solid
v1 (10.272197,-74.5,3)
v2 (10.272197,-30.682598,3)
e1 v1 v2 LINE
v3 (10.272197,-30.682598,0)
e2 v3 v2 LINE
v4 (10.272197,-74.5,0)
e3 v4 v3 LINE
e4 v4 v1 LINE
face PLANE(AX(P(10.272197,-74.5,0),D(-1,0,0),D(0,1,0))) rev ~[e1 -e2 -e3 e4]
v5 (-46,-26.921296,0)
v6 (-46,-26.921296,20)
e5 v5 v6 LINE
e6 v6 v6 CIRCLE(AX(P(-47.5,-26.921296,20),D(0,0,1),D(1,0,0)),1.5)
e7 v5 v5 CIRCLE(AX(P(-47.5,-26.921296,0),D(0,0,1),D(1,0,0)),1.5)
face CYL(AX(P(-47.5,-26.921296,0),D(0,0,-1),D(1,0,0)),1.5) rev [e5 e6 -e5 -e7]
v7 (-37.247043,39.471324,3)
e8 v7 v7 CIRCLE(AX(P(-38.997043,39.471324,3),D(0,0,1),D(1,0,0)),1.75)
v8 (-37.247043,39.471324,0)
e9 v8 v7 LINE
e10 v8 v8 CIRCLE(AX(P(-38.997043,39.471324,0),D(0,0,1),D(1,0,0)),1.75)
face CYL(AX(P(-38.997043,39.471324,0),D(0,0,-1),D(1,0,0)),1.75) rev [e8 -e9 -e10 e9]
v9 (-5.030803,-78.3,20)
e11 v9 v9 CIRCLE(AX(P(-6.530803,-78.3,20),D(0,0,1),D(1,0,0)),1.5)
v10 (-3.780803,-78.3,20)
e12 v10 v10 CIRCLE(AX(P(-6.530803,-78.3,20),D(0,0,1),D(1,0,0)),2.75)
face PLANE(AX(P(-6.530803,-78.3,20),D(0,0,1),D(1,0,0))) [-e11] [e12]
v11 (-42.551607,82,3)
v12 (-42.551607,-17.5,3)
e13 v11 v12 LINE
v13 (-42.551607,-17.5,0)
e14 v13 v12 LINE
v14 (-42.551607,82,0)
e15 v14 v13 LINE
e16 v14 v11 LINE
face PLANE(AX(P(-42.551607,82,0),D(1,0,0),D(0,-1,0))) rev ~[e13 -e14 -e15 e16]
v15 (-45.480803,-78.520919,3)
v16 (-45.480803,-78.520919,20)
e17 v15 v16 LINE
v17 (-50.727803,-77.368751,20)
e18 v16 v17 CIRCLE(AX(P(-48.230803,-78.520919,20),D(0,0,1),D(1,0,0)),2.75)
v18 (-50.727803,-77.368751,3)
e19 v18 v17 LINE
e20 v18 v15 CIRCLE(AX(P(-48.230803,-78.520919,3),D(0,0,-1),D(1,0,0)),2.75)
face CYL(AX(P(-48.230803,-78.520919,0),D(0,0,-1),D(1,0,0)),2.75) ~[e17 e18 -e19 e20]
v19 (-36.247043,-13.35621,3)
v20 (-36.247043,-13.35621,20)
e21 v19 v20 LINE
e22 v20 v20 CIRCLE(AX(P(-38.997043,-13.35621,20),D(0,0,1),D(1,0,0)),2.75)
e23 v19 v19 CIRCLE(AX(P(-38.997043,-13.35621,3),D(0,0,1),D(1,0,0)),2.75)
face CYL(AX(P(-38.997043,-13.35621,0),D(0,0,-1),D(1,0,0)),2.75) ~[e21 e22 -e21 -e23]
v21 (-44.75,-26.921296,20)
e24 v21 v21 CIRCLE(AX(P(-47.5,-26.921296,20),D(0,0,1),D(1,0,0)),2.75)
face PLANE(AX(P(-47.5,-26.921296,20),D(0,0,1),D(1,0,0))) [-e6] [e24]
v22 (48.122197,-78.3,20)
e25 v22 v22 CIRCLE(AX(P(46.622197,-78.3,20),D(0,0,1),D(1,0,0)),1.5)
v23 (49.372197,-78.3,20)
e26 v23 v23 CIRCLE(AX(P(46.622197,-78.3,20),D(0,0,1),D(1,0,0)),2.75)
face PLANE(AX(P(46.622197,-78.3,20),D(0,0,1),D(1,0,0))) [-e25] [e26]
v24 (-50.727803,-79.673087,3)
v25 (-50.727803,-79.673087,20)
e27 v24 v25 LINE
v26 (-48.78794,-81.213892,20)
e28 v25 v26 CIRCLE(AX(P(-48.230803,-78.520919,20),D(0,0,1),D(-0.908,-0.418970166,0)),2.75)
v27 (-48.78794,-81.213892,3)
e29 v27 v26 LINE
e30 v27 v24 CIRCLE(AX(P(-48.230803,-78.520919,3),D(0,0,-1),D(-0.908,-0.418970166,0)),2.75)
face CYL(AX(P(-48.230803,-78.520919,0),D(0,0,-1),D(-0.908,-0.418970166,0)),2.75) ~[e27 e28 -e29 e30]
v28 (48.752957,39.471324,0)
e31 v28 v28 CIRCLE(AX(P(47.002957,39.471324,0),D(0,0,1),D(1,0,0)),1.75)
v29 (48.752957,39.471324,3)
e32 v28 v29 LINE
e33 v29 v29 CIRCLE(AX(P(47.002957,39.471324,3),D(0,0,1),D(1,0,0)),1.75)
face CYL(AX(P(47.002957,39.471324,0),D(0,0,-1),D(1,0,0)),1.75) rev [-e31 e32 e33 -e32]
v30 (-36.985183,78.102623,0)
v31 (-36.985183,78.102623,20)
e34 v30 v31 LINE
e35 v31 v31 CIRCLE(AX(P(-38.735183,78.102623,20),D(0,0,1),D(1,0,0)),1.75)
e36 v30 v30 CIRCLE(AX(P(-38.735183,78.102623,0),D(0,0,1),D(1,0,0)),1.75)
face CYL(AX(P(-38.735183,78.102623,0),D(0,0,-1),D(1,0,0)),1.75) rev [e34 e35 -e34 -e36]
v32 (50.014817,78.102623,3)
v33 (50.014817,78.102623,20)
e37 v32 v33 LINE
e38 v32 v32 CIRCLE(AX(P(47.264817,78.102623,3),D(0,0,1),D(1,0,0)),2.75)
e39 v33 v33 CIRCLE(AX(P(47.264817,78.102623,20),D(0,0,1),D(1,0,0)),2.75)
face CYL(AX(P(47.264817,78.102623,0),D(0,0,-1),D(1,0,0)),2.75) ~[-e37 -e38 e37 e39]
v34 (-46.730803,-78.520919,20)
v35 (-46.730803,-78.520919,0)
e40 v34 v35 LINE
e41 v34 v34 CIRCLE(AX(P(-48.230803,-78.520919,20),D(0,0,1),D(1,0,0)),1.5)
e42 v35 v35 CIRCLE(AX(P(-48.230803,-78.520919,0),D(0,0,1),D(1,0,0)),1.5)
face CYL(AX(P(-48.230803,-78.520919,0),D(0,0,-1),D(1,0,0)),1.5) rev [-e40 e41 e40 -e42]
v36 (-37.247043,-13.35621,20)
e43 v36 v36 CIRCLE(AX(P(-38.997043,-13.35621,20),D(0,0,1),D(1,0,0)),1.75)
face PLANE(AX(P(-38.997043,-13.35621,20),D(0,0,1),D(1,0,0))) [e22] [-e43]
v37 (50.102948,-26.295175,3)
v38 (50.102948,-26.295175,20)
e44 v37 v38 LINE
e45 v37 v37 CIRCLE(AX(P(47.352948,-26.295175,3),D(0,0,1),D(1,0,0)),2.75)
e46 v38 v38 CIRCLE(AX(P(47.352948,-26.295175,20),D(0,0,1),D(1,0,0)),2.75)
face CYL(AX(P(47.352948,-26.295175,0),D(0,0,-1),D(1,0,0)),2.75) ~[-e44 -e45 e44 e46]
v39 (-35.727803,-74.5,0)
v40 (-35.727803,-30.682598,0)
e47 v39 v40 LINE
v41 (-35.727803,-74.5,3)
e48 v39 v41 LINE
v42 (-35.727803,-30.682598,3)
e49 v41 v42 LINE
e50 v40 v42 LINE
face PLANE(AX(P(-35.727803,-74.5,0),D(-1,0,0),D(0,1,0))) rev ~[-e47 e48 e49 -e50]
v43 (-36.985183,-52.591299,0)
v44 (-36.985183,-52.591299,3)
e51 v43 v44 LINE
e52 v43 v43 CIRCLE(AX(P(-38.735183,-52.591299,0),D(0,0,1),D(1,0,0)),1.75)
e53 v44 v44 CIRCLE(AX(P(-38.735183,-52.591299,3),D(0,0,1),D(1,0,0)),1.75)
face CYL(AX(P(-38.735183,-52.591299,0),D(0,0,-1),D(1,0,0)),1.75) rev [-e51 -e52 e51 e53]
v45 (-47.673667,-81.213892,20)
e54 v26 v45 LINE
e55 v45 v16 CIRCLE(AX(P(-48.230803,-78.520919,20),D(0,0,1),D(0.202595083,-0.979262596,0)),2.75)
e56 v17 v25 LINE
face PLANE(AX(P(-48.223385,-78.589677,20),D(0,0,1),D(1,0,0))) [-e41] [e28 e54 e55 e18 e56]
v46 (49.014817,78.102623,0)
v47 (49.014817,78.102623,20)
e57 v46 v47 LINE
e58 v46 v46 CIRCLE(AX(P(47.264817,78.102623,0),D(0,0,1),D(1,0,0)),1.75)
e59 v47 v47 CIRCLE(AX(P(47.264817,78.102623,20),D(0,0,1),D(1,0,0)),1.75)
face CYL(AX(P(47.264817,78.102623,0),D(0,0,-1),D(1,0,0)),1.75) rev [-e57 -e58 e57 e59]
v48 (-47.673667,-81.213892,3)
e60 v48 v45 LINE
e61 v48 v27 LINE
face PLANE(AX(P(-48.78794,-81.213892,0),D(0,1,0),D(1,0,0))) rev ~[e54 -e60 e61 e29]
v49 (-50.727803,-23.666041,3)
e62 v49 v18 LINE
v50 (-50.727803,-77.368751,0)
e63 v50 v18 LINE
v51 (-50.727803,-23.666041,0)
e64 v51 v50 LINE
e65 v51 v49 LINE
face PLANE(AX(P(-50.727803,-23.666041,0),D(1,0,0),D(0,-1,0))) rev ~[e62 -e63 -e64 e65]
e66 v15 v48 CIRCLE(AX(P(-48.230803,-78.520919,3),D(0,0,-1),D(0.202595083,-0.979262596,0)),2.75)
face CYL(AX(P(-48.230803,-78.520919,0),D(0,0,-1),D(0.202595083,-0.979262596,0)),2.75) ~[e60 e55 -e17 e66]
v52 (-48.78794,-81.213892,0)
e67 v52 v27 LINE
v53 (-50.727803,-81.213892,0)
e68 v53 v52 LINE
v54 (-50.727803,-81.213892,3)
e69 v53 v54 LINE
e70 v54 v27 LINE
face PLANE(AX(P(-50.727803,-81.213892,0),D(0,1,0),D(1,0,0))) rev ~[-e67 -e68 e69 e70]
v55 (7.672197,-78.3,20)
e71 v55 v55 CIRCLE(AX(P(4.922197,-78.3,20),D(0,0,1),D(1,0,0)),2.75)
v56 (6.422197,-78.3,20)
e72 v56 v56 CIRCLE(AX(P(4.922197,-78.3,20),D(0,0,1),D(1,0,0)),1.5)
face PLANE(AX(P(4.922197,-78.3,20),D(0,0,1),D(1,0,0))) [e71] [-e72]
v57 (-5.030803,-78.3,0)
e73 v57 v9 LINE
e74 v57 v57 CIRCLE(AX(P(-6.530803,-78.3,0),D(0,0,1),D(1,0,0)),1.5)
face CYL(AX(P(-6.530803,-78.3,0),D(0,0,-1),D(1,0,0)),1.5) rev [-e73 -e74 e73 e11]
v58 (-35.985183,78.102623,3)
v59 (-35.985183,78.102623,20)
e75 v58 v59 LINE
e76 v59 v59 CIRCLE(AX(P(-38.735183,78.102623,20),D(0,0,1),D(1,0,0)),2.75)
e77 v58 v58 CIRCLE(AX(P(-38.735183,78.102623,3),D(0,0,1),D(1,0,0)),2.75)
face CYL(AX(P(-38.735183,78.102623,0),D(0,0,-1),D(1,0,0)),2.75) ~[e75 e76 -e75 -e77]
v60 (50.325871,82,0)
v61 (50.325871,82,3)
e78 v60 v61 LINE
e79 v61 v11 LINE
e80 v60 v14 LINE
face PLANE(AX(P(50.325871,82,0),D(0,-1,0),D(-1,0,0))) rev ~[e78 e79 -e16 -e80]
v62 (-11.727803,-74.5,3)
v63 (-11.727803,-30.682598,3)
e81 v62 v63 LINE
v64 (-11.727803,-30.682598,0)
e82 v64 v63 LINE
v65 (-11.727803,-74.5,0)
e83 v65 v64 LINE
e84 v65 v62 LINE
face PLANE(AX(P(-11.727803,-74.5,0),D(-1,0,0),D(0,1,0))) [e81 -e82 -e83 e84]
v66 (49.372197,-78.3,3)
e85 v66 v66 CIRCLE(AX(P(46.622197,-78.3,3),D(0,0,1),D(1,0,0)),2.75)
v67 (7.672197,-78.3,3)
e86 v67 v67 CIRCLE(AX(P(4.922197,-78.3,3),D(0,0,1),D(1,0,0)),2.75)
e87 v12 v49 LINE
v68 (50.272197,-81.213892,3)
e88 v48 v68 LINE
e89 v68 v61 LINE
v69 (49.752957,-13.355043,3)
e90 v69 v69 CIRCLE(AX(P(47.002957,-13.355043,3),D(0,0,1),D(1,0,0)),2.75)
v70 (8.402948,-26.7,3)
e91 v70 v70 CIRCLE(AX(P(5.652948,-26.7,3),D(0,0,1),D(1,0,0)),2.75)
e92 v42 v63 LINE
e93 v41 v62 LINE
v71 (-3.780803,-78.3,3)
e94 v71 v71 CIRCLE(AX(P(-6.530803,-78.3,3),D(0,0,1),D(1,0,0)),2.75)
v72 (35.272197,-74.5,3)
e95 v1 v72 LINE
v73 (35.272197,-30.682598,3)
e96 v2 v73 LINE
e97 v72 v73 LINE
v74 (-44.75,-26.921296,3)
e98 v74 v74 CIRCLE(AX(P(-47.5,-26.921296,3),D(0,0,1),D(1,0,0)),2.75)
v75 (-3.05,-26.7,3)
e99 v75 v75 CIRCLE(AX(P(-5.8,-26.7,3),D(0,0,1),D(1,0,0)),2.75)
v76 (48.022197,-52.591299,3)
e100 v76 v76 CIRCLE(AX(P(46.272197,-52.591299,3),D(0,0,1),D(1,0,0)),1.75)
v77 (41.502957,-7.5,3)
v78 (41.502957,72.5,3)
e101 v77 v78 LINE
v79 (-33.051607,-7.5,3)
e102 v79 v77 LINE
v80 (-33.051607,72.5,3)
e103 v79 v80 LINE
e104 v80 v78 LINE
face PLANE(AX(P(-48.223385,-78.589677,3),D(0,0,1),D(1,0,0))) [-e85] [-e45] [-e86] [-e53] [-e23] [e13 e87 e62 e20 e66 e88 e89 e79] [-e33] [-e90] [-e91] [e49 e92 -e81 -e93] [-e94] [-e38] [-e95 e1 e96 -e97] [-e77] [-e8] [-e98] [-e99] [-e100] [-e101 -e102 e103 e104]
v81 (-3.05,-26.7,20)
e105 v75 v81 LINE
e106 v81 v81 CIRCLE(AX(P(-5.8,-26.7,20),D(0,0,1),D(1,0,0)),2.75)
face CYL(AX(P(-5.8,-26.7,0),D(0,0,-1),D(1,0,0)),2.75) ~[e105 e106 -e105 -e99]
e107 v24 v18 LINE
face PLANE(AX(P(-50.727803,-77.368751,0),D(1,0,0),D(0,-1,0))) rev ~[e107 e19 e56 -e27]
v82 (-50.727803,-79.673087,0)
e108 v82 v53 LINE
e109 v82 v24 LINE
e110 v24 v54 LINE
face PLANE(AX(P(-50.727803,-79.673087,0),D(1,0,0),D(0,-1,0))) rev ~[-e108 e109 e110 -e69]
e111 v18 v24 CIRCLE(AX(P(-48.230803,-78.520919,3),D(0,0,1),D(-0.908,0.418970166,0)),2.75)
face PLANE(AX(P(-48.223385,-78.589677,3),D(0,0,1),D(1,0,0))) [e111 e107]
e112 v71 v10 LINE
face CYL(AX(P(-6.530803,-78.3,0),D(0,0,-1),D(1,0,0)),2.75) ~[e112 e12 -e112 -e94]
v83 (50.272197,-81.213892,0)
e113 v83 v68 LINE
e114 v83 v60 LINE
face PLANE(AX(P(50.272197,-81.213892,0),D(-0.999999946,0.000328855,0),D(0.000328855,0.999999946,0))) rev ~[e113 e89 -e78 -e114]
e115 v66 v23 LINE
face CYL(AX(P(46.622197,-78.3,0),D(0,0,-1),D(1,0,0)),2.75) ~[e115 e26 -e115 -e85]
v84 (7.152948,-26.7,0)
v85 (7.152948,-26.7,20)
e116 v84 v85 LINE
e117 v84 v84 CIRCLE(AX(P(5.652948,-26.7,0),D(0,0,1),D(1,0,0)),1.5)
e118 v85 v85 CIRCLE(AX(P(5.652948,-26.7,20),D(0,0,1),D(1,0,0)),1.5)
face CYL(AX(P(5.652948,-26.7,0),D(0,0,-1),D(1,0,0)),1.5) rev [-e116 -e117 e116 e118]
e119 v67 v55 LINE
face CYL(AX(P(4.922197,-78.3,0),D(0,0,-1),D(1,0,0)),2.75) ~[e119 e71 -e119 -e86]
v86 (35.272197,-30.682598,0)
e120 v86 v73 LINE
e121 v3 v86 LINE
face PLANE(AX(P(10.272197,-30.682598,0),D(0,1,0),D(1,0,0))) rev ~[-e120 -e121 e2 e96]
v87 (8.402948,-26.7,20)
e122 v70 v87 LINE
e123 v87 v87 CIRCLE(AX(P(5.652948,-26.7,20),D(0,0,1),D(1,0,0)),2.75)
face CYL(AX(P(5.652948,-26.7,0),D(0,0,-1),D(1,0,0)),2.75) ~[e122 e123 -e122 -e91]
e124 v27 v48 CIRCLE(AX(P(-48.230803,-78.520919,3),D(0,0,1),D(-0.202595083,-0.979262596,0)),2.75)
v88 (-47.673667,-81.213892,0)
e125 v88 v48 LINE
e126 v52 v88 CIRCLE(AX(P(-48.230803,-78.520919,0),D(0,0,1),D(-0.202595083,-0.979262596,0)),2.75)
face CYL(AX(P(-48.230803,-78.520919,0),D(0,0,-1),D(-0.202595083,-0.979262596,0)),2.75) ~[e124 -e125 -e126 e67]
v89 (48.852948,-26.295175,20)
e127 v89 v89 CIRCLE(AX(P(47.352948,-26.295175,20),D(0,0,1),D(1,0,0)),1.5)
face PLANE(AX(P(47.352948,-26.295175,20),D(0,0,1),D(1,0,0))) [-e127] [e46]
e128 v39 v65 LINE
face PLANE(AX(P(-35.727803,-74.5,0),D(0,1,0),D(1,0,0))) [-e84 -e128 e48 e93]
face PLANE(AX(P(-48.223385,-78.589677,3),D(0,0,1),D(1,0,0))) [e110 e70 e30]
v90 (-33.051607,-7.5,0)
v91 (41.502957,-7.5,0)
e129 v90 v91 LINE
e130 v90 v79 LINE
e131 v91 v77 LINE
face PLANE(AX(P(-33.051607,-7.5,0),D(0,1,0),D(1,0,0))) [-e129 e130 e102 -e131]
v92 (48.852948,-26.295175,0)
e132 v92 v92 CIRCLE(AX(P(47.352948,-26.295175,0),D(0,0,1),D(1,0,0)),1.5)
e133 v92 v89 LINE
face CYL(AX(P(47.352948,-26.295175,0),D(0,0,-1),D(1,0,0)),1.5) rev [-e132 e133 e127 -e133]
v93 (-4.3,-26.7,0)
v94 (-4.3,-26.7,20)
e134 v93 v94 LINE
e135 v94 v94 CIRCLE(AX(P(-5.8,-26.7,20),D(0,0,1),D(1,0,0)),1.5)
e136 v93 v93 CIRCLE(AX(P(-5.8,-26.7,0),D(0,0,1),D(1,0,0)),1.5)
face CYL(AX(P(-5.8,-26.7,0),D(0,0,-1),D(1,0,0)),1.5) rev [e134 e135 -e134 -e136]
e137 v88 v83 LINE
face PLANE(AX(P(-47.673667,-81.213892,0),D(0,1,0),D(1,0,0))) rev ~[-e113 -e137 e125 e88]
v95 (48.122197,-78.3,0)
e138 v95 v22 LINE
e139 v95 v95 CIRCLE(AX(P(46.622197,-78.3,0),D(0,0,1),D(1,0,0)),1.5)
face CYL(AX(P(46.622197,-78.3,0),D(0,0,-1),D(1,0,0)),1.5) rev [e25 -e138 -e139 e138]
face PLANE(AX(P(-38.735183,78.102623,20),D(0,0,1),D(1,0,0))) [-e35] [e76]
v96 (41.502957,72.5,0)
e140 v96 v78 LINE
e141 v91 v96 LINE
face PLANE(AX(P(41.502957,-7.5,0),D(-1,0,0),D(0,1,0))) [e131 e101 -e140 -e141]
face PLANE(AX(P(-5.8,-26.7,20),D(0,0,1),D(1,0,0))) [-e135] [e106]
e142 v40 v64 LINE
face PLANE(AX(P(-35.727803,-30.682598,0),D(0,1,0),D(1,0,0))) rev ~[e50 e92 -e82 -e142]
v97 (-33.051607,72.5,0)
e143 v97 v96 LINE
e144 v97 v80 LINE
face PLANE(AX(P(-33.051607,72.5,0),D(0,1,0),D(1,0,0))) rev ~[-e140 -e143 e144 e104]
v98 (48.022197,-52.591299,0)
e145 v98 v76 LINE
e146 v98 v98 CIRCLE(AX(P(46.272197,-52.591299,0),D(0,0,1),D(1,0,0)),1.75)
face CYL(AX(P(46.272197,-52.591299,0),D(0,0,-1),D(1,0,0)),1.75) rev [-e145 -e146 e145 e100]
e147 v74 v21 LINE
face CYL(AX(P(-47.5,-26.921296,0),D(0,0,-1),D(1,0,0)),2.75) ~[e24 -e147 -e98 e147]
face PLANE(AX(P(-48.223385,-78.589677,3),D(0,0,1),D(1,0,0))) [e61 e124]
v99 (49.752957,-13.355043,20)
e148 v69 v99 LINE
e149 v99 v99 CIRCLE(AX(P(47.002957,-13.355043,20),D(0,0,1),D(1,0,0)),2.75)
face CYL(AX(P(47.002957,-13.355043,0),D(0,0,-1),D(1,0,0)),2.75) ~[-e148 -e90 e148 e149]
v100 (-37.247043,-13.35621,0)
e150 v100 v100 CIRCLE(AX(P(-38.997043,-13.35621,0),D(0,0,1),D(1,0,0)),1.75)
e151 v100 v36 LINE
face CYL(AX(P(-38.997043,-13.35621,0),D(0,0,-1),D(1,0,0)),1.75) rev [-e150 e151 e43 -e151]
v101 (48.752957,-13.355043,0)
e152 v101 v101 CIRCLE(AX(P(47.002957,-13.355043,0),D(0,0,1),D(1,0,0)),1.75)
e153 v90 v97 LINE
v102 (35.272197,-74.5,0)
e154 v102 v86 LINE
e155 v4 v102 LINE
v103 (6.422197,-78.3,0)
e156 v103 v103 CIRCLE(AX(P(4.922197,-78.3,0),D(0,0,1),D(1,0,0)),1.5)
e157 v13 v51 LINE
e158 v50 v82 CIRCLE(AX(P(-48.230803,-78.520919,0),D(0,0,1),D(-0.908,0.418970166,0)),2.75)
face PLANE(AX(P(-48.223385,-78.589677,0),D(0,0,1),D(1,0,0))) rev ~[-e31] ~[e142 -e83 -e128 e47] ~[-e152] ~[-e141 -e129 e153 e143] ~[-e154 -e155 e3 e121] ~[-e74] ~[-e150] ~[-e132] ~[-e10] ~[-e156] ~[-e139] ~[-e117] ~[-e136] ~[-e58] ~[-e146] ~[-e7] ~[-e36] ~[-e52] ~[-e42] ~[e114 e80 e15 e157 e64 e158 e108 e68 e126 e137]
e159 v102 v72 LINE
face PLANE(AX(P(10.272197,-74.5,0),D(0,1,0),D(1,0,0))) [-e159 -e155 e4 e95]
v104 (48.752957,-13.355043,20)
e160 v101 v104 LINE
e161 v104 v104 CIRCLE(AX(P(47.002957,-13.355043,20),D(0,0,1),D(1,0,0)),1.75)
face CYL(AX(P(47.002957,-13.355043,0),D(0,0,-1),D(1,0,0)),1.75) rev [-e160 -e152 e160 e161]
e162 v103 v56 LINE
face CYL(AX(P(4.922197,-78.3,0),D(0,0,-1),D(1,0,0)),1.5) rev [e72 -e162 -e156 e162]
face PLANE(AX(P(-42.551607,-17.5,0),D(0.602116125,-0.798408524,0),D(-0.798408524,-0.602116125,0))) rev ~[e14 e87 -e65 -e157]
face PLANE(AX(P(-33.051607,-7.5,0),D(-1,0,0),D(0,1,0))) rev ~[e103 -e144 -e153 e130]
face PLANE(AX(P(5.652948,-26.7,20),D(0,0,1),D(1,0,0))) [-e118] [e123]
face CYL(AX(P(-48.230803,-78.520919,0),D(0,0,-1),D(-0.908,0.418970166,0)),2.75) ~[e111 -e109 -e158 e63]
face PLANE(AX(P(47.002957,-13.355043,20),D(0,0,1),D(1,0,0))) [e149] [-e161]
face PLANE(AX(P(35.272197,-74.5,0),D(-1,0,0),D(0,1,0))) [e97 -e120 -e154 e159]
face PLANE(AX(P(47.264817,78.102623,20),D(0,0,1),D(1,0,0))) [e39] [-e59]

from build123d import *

# Parameters (mm, degrees)
F0_R     = 1.5
F0_R_2   = 1.75
F0_R_3   = 2.75
F0_W     = 24
F0_H     = 43.8174021336
F0_W_2   = 25
F0_W_3   = 74.5545638204
F0_H_2   = 80
F1_DEPTH = 3
F2_DEPTH = 20
F3_DEPTH = 20


# Not quite as in the source:
# - a feature names something its author has since deleted; it is built from what else it names


with BuildPart() as f1:
    # F0 (on Top) → F1 (new body)
    with BuildSketch(Plane.XY):
        with BuildLine():
            ThreePointArc((-47.6736667828, -81.2138915062), (-46.0983603754, -80.2573488478), (-45.4808032601, -78.5209193664))
            ThreePointArc((-45.4808032601, -78.5209193664), (-47.6409939689, -75.8349139681), (-50.7278032601, -77.3687514099))
            Line((-50.7278032601, -77.3687514099), (-50.7278032601, -79.6730873229))
            ThreePointArc((-50.7278032601, -79.6730873229), (-49.9411999358, -80.6742988526), (-48.7879397374, -81.2138915062))
            Line((-48.7879397374, -81.2138915062), (-47.6736667828, -81.2138915062))
        make_face()
        with Locations((-48.2308032601, -78.5209193664)):
            Circle(F0_R, mode=Mode.SUBTRACT)
        with BuildLine():
            ThreePointArc((-50.7278032601, -77.3687514099), (-47.6409939689, -75.8349139681), (-45.4808032601, -78.5209193664))
            ThreePointArc((-45.4808032601, -78.5209193664), (-46.0983603754, -80.2573488478), (-47.6736667828, -81.2138915062))
            Line((-47.6736667828, -81.2138915062), (50.2721967399, -81.2138915062))
            Line((50.2721967399, -81.2138915062), (50.3258705139, 82))
            Line((50.3258705139, 82), (-42.5516068935, 82))
            Line((-42.5516068935, 82), (-42.5516068935, -17.5))
            Line((-42.5516068935, -17.5), (-50.7278032601, -23.6660409719))
            Line((-50.7278032601, -23.6660409719), (-50.7278032601, -77.3687514099))
        make_face()
        with Locations((-38.7351833579, -52.5912989332)):
            Circle(F0_R_2, mode=Mode.SUBTRACT)
        with Locations((-6.5308032601, -78.3)):
            Circle(F0_R_3, mode=Mode.SUBTRACT)
        with Locations((-23.7278032601, -52.5912989332)):
            Rectangle(F0_W, F0_H, mode=Mode.SUBTRACT)
        with Locations((-47.5, -26.9212964922)):
            Circle(F0_R_3, mode=Mode.SUBTRACT)
        with Locations((-38.9970433209, -13.3562097783)):
            Circle(F0_R_3, mode=Mode.SUBTRACT)
        with Locations((-5.8, -26.7)):
            Circle(F0_R_3, mode=Mode.SUBTRACT)
        with Locations((4.9221967399, -78.3)):
            Circle(F0_R_3, mode=Mode.SUBTRACT)
        with Locations((22.7721967399, -52.5912989332)):
            Rectangle(F0_W_2, F0_H, mode=Mode.SUBTRACT)
        with Locations((46.6221967399, -78.3)):
            Circle(F0_R_3, mode=Mode.SUBTRACT)
        with Locations((46.2721967399, -52.5912989332)):
            Circle(F0_R_2, mode=Mode.SUBTRACT)
        with Locations((5.6529477609, -26.7)):
            Circle(F0_R_3, mode=Mode.SUBTRACT)
        with Locations((47.3529477609, -26.2951753209)):
            Circle(F0_R_3, mode=Mode.SUBTRACT)
        with Locations((47.0029571713, -13.3550426021)):
            Circle(F0_R_3, mode=Mode.SUBTRACT)
        with Locations((-38.9970430732, 39.4713241122)):
            Circle(F0_R_2, mode=Mode.SUBTRACT)
        with Locations((-38.7351833579, 78.1026230454)):
            Circle(F0_R_3, mode=Mode.SUBTRACT)
        with Locations((4.2256750166, 32.5)):
            Rectangle(F0_W_3, F0_H_2, mode=Mode.SUBTRACT)
        with Locations((47.0029569268, 39.4713241122)):
            Circle(F0_R_2, mode=Mode.SUBTRACT)
        with Locations((47.2648166418, 78.1026230454)):
            Circle(F0_R_3, mode=Mode.SUBTRACT)
        with BuildLine():
            Line((-50.7278032601, -79.6730873229), (-50.7278032601, -77.3687514099))
            ThreePointArc((-50.7278032601, -77.3687514099), (-50.9808032601, -78.5209193664), (-50.7278032601, -79.6730873229))
        make_face()
        with BuildLine():
            ThreePointArc((-48.7879397374, -81.2138915062), (-48.2308032601, -81.2709193664), (-47.6736667828, -81.2138915062))
            Line((-47.6736667828, -81.2138915062), (-48.7879397374, -81.2138915062))
        make_face()
        with BuildLine():
            ThreePointArc((-48.7879397374, -81.2138915062), (-49.9411999358, -80.6742988526), (-50.7278032601, -79.6730873229))
            Line((-50.7278032601, -79.6730873229), (-50.7278032601, -81.2138915062))
            Line((-50.7278032601, -81.2138915062), (-48.7879397374, -81.2138915062))
        make_face()
    extrude(amount=F1_DEPTH)

    # F0 (on Top) → F2 (join)
    with BuildSketch(Plane.XY):
        with Locations((-38.7351833579, 78.1026230454)):
            Circle(F0_R_3)
        with Locations((-38.7351833579, 78.1026230454)):
            Circle(F0_R_2, mode=Mode.SUBTRACT)
    extrude(amount=F2_DEPTH)

    # F0 (on Top) → F3 (join)
    with BuildSketch(Plane.XY):
        with Locations((47.2648166418, 78.1026230454)):
            Circle(F0_R_3)
        with Locations((47.2648166418, 78.1026230454)):
            Circle(F0_R_2, mode=Mode.SUBTRACT)
        with Locations((-38.9970433209, -13.3562097783)):
            Circle(F0_R_3)
        with Locations((-38.9970433209, -13.3562097783)):
            Circle(F0_R_2, mode=Mode.SUBTRACT)
        with Locations((47.3529477609, -26.2951753209)):
            Circle(F0_R_3)
        with Locations((47.3529477609, -26.2951753209)):
            Circle(F0_R, mode=Mode.SUBTRACT)
        with Locations((5.6529477609, -26.7)):
            Circle(F0_R_3)
        with Locations((5.6529477609, -26.7)):
            Circle(F0_R, mode=Mode.SUBTRACT)
        with Locations((-5.8, -26.7)):
            Circle(F0_R_3)
        with Locations((-5.8, -26.7)):
            Circle(F0_R, mode=Mode.SUBTRACT)
        with Locations((-47.5, -26.9212964922)):
            Circle(F0_R_3)
        with Locations((-47.5, -26.9212964922)):
            Circle(F0_R, mode=Mode.SUBTRACT)
        with BuildLine():
            ThreePointArc((-47.6736667828, -81.2138915062), (-46.0983603754, -80.2573488478), (-45.4808032601, -78.5209193664))
            ThreePointArc((-45.4808032601, -78.5209193664), (-47.6409939689, -75.8349139681), (-50.7278032601, -77.3687514099))
            Line((-50.7278032601, -77.3687514099), (-50.7278032601, -79.6730873229))
            ThreePointArc((-50.7278032601, -79.6730873229), (-49.9411999358, -80.6742988526), (-48.7879397374, -81.2138915062))
            Line((-48.7879397374, -81.2138915062), (-47.6736667828, -81.2138915062))
        make_face()
        with Locations((-48.2308032601, -78.5209193664)):
            Circle(F0_R, mode=Mode.SUBTRACT)
        with Locations((-6.5308032601, -78.3)):
            Circle(F0_R_3)
        with Locations((-6.5308032601, -78.3)):
            Circle(F0_R, mode=Mode.SUBTRACT)
        with Locations((4.9221967399, -78.3)):
            Circle(F0_R_3)
        with Locations((4.9221967399, -78.3)):
            Circle(F0_R, mode=Mode.SUBTRACT)
        with Locations((46.6221967399, -78.3)):
            Circle(F0_R_3)
        with Locations((46.6221967399, -78.3)):
            Circle(F0_R, mode=Mode.SUBTRACT)
        with Locations((47.0029571713, -13.3550426021)):
            Circle(F0_R_3)
        with Locations((47.0029571713, -13.3550426021)):
            Circle(F0_R_2, mode=Mode.SUBTRACT)
    extrude(amount=F3_DEPTH)


solid = f1.part
